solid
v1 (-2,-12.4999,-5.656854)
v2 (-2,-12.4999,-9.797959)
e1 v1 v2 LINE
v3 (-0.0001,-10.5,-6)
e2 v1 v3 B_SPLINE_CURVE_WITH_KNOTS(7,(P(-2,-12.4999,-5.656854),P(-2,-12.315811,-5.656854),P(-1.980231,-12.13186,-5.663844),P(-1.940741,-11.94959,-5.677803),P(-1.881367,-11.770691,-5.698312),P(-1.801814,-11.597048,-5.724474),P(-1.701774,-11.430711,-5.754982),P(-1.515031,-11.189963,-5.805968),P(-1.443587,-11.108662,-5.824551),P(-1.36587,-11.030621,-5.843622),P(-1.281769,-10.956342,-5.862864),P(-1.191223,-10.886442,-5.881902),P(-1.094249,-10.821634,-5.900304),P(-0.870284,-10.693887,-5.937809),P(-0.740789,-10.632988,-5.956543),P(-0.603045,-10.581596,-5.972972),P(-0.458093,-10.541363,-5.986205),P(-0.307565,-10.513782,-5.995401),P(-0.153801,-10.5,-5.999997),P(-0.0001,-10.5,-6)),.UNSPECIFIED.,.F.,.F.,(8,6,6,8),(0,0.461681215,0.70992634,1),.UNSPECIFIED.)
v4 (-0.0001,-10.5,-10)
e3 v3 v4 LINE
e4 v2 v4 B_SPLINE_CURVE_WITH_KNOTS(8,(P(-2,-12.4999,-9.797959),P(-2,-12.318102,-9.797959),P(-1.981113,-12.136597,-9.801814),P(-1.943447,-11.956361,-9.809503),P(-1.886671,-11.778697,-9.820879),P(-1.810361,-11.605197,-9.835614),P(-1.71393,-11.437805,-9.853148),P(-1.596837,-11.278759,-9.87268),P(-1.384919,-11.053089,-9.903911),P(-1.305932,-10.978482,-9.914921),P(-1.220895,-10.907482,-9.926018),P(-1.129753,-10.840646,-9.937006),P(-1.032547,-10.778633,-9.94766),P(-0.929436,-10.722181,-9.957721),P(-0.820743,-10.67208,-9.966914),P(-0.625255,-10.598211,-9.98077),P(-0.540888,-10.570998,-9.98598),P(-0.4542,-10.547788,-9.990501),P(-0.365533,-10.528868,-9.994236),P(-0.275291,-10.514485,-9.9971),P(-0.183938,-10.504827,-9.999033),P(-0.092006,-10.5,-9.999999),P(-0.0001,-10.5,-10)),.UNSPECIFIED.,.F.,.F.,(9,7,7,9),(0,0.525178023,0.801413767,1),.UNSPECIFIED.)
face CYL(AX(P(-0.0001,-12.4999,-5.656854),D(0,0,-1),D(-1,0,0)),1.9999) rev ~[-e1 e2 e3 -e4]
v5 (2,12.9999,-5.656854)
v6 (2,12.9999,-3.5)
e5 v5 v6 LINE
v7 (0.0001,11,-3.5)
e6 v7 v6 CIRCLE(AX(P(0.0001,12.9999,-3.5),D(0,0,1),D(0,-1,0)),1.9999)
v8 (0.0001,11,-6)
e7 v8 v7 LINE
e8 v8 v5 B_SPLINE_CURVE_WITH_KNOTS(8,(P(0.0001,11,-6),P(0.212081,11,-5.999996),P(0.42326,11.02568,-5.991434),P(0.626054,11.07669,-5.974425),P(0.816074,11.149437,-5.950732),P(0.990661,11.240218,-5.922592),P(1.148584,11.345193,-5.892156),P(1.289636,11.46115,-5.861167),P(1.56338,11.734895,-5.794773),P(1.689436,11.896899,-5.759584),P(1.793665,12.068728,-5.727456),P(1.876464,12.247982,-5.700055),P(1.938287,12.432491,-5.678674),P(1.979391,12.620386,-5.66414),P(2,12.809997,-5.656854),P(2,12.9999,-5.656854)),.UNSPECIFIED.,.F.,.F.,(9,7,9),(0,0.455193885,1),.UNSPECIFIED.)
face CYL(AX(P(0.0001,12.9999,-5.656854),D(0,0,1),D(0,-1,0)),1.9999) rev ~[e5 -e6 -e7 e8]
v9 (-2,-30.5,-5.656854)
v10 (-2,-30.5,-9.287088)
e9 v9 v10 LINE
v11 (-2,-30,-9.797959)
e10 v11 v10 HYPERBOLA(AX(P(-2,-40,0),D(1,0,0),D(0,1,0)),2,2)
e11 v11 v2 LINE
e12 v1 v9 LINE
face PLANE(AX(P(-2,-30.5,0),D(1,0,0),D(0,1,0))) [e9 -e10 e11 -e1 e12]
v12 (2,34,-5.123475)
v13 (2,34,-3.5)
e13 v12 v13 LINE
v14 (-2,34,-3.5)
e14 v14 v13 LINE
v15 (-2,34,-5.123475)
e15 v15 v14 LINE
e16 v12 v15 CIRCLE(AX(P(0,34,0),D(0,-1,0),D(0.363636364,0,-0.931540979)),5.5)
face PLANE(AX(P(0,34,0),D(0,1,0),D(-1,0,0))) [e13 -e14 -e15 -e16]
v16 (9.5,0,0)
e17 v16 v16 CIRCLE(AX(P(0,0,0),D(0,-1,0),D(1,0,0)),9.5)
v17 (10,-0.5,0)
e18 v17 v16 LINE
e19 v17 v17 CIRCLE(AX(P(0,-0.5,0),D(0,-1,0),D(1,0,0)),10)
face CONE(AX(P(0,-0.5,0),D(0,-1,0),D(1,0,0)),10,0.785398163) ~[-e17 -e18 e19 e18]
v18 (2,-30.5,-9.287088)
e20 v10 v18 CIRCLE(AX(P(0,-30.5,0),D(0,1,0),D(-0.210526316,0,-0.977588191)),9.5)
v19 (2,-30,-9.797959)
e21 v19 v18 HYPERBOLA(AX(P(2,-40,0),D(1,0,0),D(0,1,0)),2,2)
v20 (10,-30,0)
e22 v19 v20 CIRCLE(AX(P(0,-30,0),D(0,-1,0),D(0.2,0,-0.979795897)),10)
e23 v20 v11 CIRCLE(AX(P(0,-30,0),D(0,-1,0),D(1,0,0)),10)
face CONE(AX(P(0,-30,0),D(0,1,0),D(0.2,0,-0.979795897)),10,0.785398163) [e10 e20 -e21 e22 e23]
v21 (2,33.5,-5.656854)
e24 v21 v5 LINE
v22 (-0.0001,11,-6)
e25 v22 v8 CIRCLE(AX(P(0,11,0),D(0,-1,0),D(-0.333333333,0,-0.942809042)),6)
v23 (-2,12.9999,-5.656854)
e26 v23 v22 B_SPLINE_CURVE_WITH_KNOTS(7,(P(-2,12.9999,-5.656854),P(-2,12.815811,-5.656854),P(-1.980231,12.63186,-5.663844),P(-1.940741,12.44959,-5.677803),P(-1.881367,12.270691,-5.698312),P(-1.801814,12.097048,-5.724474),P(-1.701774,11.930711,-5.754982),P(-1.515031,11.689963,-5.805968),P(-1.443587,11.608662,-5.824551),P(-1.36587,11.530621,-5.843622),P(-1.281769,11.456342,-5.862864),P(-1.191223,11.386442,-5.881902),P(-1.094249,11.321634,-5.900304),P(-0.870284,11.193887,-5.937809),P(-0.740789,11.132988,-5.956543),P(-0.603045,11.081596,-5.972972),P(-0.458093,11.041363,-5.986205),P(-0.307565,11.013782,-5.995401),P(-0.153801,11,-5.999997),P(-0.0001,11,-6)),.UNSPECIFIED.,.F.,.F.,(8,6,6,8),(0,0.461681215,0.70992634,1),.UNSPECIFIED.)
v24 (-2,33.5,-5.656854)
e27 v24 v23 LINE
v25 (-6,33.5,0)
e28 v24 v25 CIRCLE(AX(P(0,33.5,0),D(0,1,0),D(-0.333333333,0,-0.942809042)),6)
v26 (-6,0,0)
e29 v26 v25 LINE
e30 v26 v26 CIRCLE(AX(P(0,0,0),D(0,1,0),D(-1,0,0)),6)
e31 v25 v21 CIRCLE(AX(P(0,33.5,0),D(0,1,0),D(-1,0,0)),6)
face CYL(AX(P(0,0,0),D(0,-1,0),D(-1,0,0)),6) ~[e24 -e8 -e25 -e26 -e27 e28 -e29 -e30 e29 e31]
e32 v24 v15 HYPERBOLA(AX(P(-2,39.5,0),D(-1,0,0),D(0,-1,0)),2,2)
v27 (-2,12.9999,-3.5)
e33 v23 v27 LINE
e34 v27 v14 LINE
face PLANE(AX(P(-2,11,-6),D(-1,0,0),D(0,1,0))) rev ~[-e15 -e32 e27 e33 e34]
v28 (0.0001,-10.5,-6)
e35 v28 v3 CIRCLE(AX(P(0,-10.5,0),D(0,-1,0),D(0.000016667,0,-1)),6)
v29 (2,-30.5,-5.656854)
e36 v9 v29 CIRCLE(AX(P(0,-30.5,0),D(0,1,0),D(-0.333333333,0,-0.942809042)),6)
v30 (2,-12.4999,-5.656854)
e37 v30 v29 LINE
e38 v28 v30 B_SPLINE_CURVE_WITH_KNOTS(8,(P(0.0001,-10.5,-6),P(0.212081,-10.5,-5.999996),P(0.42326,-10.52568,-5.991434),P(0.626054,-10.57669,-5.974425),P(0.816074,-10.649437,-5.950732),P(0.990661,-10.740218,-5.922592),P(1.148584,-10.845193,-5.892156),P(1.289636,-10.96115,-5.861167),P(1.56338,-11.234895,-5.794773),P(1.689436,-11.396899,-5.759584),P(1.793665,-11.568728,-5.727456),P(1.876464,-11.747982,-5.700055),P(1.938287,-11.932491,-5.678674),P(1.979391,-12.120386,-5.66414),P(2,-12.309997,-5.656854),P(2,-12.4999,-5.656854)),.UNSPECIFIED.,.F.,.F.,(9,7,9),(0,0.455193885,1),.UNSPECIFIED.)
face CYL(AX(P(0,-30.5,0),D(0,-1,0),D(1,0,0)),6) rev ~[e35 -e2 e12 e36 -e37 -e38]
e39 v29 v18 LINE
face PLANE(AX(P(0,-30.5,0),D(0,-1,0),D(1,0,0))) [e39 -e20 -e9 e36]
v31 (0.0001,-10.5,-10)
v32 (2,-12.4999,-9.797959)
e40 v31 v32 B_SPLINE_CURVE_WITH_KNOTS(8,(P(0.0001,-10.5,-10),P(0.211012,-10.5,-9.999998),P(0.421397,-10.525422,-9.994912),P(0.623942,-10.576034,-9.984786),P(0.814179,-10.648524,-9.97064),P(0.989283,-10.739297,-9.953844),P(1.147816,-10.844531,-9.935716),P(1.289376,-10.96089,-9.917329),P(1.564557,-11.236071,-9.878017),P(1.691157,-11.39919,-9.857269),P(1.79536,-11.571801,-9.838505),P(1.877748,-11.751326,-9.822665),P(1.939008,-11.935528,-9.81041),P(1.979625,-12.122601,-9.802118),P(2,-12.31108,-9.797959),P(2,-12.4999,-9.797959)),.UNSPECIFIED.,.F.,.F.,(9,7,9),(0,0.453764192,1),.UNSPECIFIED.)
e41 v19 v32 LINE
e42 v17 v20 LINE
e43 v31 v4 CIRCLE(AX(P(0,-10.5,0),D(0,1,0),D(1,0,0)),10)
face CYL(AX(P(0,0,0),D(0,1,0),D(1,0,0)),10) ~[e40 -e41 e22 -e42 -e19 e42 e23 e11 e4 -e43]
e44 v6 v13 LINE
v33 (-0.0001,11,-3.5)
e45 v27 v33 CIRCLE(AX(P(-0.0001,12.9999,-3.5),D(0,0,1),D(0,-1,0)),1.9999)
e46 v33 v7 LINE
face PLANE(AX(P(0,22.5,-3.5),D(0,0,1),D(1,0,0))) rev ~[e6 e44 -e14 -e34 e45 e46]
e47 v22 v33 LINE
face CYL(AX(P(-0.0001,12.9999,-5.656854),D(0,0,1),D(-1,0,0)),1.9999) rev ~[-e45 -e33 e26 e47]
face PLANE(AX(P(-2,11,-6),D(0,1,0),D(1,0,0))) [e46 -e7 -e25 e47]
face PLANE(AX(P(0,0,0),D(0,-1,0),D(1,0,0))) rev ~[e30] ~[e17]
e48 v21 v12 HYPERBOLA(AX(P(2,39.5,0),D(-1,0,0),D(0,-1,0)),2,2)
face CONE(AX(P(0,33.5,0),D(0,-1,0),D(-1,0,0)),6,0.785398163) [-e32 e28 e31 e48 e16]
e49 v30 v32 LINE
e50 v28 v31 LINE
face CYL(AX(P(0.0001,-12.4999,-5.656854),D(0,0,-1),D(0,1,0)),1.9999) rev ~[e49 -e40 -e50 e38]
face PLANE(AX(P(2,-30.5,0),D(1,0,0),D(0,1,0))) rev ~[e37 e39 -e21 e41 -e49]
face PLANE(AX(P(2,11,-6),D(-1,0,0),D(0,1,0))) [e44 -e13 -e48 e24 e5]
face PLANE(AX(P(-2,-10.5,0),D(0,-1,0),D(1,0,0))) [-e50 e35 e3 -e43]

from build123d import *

# Parameters (mm, degrees)
F0_R      = 10
F1_DEPTH  = 30.5
F2_R      = 6
F3_DEPTH  = 20
F4_R      = 6
F5_DEPTH  = 34
F7_W      = 4
F7_H      = 23
F8_DEPTH  = 2.5
F9_R      = 1.9999
F10_W     = 4
F10_H     = 20
F11_DEPTH = 25
F12_R     = 1.9999
F13_SIZE  = 0.5


# Not quite as in the source:
# - a fillet or chamfer is up to 0.001 mm smaller than in the source, because OpenCascade refuses the exact size


with BuildPart() as f1:
    # F0 (on Front) → F1 (new body)
    with BuildSketch(Plane.XZ):
        Circle(F0_R)
    extrude(amount=F1_DEPTH)

    # F2 (on face) → F3 (cut)
    with BuildSketch(Plane.XZ.offset(30.5)):
        Circle(F2_R)
    extrude(amount=-F3_DEPTH, mode=Mode.SUBTRACT)

    # F4 (on face) → F5 (join)
    with BuildSketch(Plane(origin=(0, 0, 0), x_dir=(-1, 0, 0), z_dir=(0, 1, 0))):
        Circle(F4_R)
    extrude(amount=F5_DEPTH)

    # F7 (on offset) → F8 (cut)
    with BuildSketch(Plane.XY.offset(-6)):
        with Locations((0, 22.5)):
            Rectangle(F7_W, F7_H)
    extrude(amount=F8_DEPTH, mode=Mode.SUBTRACT)

    # F9 (radius 2 in the source; OpenCascade refuses exactly that, so slightly less here)
    f9_edges = [f1.edges().sort_by_distance(p)[0] for p in [
        (-2, 11, -4.578427),
        (2, 11, -4.578427),
    ]]
    fillet(f9_edges, radius=F9_R)

    # F10 (on Top) → F11 (cut)
    with BuildSketch(Plane.XY):
        with Locations((0, -20.5)):
            Rectangle(F10_W, F10_H)
    extrude(amount=-F11_DEPTH, mode=Mode.SUBTRACT)

    # F12 (radius 2 in the source; OpenCascade refuses exactly that, so slightly less here)
    f12_edges = [f1.edges().sort_by_distance(p)[0] for p in [
        (2, -10.5, -7.727407),
        (-2, -10.5, -7.727407),
    ]]
    fillet(f12_edges, radius=F12_R)

    # F13
    f13_edges = [f1.edges().sort_by_distance(p)[0] for p in [
        (-10, 0, 0),
        (3.464102, 34, 4.898979),
        (-6.324555, -30.5, 7.745967),
    ]]
    chamfer(f13_edges, length=F13_SIZE)


solid = f1.part
